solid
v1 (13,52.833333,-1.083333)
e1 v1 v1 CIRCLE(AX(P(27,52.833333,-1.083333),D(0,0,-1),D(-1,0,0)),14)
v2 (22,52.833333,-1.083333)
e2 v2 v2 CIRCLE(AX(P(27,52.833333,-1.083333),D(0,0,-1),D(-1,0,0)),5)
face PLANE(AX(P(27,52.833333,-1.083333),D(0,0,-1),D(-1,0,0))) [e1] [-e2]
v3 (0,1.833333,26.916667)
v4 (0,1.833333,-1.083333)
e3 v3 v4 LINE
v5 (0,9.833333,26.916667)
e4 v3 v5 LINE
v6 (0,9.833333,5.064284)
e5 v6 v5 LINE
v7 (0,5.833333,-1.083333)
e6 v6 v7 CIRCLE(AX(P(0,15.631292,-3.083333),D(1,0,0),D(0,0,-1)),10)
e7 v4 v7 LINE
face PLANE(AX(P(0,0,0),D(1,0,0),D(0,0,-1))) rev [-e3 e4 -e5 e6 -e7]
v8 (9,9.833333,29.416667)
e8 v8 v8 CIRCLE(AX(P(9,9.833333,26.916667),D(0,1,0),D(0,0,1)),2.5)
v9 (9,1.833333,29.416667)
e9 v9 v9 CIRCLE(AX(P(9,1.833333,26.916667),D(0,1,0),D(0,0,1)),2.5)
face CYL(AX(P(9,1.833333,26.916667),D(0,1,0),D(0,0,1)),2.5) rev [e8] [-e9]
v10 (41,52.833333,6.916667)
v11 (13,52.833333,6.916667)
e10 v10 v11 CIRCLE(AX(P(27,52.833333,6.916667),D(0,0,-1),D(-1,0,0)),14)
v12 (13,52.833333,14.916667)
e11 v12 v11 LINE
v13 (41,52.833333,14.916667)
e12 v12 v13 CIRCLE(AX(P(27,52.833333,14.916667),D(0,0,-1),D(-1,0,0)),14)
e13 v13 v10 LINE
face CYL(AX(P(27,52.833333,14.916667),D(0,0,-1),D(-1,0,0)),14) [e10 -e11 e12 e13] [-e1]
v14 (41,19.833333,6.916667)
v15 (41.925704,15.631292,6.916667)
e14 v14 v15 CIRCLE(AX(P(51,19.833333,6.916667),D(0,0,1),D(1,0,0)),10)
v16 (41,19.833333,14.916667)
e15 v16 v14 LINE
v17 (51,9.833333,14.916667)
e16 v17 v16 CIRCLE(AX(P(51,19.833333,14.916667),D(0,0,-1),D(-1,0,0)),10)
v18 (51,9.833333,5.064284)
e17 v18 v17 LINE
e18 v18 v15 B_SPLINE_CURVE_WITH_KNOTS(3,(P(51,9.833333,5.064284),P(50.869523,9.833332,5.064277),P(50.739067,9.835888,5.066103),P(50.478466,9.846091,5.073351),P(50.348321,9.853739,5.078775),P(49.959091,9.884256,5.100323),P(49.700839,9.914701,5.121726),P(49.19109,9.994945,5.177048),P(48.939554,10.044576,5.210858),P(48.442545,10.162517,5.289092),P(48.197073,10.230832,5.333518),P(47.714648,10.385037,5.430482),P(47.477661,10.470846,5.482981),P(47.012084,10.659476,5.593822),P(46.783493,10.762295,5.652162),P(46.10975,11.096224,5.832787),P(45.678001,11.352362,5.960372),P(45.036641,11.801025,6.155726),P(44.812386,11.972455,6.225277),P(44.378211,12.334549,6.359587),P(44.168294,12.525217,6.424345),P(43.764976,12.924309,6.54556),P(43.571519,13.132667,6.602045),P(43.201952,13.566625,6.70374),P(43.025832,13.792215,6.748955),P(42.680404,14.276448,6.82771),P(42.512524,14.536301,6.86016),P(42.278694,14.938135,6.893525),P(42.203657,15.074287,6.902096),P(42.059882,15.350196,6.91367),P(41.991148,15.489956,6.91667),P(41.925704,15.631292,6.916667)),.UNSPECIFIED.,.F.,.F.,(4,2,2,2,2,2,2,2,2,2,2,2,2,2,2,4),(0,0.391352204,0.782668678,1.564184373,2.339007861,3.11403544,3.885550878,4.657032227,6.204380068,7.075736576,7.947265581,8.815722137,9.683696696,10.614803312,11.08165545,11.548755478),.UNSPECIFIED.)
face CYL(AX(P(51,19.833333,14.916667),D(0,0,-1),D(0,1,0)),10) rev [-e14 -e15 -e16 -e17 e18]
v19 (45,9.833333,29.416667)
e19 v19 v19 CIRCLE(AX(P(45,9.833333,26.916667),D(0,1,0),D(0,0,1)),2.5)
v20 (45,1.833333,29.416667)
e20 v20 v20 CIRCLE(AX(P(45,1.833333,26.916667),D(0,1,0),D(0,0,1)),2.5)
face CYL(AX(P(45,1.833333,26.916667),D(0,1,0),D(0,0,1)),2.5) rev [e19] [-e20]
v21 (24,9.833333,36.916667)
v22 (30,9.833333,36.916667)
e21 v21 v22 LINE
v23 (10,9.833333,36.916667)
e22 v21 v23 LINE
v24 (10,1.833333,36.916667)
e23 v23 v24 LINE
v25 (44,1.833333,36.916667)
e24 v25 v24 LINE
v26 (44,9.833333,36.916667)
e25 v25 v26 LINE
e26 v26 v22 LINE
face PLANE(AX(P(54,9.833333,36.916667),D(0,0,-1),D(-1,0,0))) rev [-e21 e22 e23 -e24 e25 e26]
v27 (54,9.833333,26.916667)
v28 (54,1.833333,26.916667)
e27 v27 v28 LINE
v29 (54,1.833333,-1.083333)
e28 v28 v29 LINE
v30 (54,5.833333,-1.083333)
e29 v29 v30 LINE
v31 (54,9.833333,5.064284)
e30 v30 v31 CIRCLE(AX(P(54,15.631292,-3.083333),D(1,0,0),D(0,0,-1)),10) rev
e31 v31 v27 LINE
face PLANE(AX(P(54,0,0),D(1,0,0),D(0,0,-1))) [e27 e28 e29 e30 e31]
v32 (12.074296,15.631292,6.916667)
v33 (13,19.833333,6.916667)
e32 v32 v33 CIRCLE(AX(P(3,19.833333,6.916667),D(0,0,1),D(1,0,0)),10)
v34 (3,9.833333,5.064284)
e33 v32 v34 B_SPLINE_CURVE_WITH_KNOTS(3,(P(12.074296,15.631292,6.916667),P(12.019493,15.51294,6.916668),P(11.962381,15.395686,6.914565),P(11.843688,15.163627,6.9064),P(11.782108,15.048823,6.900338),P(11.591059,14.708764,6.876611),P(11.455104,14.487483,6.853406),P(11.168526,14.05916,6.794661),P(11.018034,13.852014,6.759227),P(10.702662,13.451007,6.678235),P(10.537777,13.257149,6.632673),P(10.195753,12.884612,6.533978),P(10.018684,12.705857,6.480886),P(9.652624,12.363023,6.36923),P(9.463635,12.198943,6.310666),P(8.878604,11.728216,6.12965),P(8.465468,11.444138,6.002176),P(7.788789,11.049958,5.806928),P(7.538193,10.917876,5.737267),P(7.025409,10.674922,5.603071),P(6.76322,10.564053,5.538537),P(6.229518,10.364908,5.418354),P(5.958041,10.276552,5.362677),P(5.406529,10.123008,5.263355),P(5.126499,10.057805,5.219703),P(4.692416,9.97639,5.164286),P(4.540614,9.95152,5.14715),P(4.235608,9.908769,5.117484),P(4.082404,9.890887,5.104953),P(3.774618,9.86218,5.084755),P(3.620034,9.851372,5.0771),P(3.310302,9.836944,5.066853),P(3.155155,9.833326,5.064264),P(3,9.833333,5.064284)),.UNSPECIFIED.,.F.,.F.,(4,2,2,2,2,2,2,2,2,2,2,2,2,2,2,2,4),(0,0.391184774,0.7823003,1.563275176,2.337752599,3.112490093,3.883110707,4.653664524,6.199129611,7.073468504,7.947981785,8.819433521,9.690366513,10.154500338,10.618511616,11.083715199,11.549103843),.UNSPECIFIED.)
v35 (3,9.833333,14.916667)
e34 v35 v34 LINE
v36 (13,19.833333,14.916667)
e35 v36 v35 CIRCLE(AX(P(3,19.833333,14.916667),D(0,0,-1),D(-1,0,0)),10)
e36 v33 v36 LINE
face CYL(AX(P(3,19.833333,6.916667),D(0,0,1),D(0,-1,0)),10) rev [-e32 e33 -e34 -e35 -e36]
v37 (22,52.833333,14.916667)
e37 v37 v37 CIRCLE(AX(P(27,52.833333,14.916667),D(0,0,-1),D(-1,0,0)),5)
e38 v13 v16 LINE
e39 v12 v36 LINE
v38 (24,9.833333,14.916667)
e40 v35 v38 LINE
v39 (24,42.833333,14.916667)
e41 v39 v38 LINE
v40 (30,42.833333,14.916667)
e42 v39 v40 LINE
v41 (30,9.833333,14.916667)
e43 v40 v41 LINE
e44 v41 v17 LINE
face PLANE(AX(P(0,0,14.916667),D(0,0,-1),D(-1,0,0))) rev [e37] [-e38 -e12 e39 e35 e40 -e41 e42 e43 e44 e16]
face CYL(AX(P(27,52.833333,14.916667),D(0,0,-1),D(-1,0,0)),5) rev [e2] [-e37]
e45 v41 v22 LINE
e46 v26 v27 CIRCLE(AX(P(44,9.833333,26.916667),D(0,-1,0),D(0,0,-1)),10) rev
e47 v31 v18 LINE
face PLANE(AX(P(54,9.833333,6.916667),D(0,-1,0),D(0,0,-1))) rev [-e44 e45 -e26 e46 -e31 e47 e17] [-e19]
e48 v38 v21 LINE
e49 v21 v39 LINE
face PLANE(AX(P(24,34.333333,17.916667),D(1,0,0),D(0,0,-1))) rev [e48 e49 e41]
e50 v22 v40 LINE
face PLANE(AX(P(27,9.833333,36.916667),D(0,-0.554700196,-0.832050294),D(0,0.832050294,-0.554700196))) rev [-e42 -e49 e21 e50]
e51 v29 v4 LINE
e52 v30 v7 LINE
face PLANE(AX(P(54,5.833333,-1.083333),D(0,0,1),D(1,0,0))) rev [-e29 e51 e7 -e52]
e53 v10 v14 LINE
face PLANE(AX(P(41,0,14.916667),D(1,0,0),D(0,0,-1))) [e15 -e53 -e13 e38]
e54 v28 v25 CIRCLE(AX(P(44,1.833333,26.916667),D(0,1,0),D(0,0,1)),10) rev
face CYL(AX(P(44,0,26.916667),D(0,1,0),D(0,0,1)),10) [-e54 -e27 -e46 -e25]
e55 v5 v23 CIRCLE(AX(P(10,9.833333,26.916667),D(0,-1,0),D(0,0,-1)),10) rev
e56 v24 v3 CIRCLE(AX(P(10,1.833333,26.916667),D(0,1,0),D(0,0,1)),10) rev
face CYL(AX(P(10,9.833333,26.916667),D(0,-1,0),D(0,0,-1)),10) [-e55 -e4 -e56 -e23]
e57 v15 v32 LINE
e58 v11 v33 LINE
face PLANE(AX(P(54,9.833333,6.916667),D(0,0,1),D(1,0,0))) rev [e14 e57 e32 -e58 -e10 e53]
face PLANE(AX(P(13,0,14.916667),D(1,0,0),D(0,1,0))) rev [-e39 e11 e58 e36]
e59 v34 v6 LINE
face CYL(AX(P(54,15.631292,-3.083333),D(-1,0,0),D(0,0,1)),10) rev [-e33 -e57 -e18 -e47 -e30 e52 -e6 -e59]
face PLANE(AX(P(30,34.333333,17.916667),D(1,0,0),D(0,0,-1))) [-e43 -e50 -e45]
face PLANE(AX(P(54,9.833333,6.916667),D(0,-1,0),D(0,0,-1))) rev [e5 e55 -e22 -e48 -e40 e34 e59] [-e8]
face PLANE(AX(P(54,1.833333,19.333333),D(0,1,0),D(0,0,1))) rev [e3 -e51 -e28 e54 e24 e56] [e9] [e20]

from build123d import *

# Parameters (mm, degrees)
Y_KSEKLIK_EKSTR_ZYON1_DEPTH = 54
IZIM2_R                     = 5
Y_KSEKLIK_EKSTR_ZYON2_DEPTH = 8
FEDER2_REACH                = 82.985
IZIM6_WALL_W                = 203.630625642
IZIM6_WALL_H                = 6
Y_KSEKLIK_EKSTR_ZYON3_START = 8
IZIM7_R                     = 14
IZIM7_R_2                   = 5
Y_KSEKLIK_EKSTR_ZYON3_DEPTH = 8
RADYUS1_R                   = 10
RADYUS2_START               = 13.0000001
RADYUS2_DEPTH               = 27.9999998
RADYUS2_2_DEPTH             = 54
RADYUS2_START_2             = -1.083333333
RADYUS2_3_DEPTH             = 8
RADYUS3_R                   = 10
IZIM9_R                     = 2.5
KES_EKSTR_ZYON1_DEPTH       = 87.763127471


with BuildPart() as part:
    # Çizim1 → Yükseklik-Ekstrüzyon1 (new body)
    with BuildSketch(Plane(origin=(0, 0, 0), x_dir=(0, 0, -1), z_dir=(1, 0, 0))):
        Polygon((-6.916666667, 9.833333333), (-36.916666667, 9.833333333), (-36.916666667, 1.833333333), (-19.333333333, 1.833333333), (1.083333333, 1.833333333), (1.083333333, 5.833333333), (-6.916666667, 5.833333333), align=None)
    extrude(amount=Y_KSEKLIK_EKSTR_ZYON1_DEPTH)

    # Çizim2 → Yükseklik-Ekstrüzyon2 (add)
    with BuildSketch(Plane(origin=(0, 0, 6.916666667), x_dir=(-1, 0, 0), z_dir=(0, 0, -1))):
        with BuildLine():
            ThreePointArc((-13, 52.833333333), (-27, 66.833333333), (-41, 52.833333333))
            Line((-41, 52.833333333), (-41, 9.833333333))
            Line((-41, 9.833333333), (-13, 9.833333333))
            Line((-13, 9.833333333), (-13, 52.833333333))
        make_face()
        with Locations((-27, 52.833333333)):
            Circle(IZIM2_R, mode=Mode.SUBTRACT)
    extrude(amount=-Y_KSEKLIK_EKSTR_ZYON2_DEPTH)

    # Çizim6 wall → Feder2 (add, up to next)
    with BuildSketch(Plane(origin=(27, 26.333333333, 25.916666667), x_dir=(0, 0.832050294338, -0.554700196225), z_dir=(0, 0.554700196225, 0.832050294338)), mode=Mode.PRIVATE) as feder2_sk1:
        Rectangle(IZIM6_WALL_W, IZIM6_WALL_H)
    feder2_tool1 = extrude(feder2_sk1.sketch, amount=-FEDER2_REACH, mode=Mode.PRIVATE) - part.part
    add(feder2_tool1.solids().sort_by_distance((27, 26.333333333, 25.916666667))[0])

    # Çizim7 → Yükseklik-Ekstrüzyon3 (add)
    with BuildSketch(Plane(origin=(0, 0, 6.916666667), x_dir=(-1, 0, 0), z_dir=(0, 0, -1)).offset(Y_KSEKLIK_EKSTR_ZYON3_START)):
        with Locations((-27, 52.833333333)):
            Circle(IZIM7_R)
        with Locations((-27, 52.833333333)):
            Circle(IZIM7_R_2, mode=Mode.SUBTRACT)
    extrude(amount=-Y_KSEKLIK_EKSTR_ZYON3_DEPTH)

    # Radyus1
    radyus1_edges = [part.edges().sort_by_distance(p)[0] for p in [
        (13, 9.833333333, 10.916666667),
        (41, 9.833333333, 10.916666667),
    ]]
    fillet(radyus1_edges, radius=RADYUS1_R)

    # Radyus2: read off the stored shape, not the designer's step
    # Radyus2 outline → Radyus2 (add)
    with BuildSketch(Plane.YZ.offset(RADYUS2_START)):
        with BuildLine():
            Line((5.833333333, 6.916666667), (5.833333333, -1.083333333))
            ThreePointArc((5.833333333, -1.083333333), (9.306736984, 4.662633359), (15.631292304, 6.916666667))
            Line((15.631292304, 6.916666667), (5.833333333, 6.916666667))
        make_face()
    extrude(amount=RADYUS2_DEPTH)

    # Radyus2 2 outline → Radyus2 2 (add)
    with BuildSketch(Plane.YZ):
        with BuildLine():
            Line((5.833333333, 6.916666667), (5.833333333, -1.083333333))
            ThreePointArc((5.833333333, -1.083333333), (9.306736984, 4.662633359), (15.631292304, 6.916666667))
            Line((15.631292304, 6.916666667), (5.833333333, 6.916666667))
        make_face()
    extrude(amount=RADYUS2_2_DEPTH)

    # Radyus2 3 outline → Radyus2 3 (cut)
    with BuildSketch(Plane.XY.offset(RADYUS2_START_2)):
        with BuildLine():
            Line((-1, 9.833333333), (3, 9.833333333))
            ThreePointArc((3, 9.833333333), (8.986094999, 11.822923439), (12.590214921, 17))
            Line((12.590214921, 17), (-1, 17))
            Line((-1, 17), (-1, 9.833333333))
        make_face()
        with BuildLine():
            Line((55, 17), (41.409785079, 17))
            ThreePointArc((41.409785079, 17), (45.013905001, 11.822923439), (51, 9.833333333))
            Line((51, 9.833333333), (55, 9.833333333))
            Line((55, 9.833333333), (55, 17))
        make_face()
    extrude(amount=RADYUS2_3_DEPTH, mode=Mode.SUBTRACT)

    # Radyus3
    radyus3_edges = [part.edges().sort_by_distance(p)[0] for p in [
        (54, 5.833333333, 36.916666667),
        (0, 5.833333333, 36.916666667),
    ]]
    fillet(radyus3_edges, radius=RADYUS3_R)

    # Çizim9 → Kes-Ekstrüzyon1 (cut, through all)
    with BuildSketch(Plane(origin=(0, 9.833333333, 0), x_dir=(1, 0, 0), z_dir=(0, 1, 0))):
        with Locations(Location((9, -26.916666667, 0), (0, 0, 270))):
            Circle(IZIM9_R)
        with Locations(Location((45, -26.916666667, 0), (0, 0, 270))):
            Circle(IZIM9_R)
    extrude(amount=-KES_EKSTR_ZYON1_DEPTH, mode=Mode.SUBTRACT)


solid = part.part
